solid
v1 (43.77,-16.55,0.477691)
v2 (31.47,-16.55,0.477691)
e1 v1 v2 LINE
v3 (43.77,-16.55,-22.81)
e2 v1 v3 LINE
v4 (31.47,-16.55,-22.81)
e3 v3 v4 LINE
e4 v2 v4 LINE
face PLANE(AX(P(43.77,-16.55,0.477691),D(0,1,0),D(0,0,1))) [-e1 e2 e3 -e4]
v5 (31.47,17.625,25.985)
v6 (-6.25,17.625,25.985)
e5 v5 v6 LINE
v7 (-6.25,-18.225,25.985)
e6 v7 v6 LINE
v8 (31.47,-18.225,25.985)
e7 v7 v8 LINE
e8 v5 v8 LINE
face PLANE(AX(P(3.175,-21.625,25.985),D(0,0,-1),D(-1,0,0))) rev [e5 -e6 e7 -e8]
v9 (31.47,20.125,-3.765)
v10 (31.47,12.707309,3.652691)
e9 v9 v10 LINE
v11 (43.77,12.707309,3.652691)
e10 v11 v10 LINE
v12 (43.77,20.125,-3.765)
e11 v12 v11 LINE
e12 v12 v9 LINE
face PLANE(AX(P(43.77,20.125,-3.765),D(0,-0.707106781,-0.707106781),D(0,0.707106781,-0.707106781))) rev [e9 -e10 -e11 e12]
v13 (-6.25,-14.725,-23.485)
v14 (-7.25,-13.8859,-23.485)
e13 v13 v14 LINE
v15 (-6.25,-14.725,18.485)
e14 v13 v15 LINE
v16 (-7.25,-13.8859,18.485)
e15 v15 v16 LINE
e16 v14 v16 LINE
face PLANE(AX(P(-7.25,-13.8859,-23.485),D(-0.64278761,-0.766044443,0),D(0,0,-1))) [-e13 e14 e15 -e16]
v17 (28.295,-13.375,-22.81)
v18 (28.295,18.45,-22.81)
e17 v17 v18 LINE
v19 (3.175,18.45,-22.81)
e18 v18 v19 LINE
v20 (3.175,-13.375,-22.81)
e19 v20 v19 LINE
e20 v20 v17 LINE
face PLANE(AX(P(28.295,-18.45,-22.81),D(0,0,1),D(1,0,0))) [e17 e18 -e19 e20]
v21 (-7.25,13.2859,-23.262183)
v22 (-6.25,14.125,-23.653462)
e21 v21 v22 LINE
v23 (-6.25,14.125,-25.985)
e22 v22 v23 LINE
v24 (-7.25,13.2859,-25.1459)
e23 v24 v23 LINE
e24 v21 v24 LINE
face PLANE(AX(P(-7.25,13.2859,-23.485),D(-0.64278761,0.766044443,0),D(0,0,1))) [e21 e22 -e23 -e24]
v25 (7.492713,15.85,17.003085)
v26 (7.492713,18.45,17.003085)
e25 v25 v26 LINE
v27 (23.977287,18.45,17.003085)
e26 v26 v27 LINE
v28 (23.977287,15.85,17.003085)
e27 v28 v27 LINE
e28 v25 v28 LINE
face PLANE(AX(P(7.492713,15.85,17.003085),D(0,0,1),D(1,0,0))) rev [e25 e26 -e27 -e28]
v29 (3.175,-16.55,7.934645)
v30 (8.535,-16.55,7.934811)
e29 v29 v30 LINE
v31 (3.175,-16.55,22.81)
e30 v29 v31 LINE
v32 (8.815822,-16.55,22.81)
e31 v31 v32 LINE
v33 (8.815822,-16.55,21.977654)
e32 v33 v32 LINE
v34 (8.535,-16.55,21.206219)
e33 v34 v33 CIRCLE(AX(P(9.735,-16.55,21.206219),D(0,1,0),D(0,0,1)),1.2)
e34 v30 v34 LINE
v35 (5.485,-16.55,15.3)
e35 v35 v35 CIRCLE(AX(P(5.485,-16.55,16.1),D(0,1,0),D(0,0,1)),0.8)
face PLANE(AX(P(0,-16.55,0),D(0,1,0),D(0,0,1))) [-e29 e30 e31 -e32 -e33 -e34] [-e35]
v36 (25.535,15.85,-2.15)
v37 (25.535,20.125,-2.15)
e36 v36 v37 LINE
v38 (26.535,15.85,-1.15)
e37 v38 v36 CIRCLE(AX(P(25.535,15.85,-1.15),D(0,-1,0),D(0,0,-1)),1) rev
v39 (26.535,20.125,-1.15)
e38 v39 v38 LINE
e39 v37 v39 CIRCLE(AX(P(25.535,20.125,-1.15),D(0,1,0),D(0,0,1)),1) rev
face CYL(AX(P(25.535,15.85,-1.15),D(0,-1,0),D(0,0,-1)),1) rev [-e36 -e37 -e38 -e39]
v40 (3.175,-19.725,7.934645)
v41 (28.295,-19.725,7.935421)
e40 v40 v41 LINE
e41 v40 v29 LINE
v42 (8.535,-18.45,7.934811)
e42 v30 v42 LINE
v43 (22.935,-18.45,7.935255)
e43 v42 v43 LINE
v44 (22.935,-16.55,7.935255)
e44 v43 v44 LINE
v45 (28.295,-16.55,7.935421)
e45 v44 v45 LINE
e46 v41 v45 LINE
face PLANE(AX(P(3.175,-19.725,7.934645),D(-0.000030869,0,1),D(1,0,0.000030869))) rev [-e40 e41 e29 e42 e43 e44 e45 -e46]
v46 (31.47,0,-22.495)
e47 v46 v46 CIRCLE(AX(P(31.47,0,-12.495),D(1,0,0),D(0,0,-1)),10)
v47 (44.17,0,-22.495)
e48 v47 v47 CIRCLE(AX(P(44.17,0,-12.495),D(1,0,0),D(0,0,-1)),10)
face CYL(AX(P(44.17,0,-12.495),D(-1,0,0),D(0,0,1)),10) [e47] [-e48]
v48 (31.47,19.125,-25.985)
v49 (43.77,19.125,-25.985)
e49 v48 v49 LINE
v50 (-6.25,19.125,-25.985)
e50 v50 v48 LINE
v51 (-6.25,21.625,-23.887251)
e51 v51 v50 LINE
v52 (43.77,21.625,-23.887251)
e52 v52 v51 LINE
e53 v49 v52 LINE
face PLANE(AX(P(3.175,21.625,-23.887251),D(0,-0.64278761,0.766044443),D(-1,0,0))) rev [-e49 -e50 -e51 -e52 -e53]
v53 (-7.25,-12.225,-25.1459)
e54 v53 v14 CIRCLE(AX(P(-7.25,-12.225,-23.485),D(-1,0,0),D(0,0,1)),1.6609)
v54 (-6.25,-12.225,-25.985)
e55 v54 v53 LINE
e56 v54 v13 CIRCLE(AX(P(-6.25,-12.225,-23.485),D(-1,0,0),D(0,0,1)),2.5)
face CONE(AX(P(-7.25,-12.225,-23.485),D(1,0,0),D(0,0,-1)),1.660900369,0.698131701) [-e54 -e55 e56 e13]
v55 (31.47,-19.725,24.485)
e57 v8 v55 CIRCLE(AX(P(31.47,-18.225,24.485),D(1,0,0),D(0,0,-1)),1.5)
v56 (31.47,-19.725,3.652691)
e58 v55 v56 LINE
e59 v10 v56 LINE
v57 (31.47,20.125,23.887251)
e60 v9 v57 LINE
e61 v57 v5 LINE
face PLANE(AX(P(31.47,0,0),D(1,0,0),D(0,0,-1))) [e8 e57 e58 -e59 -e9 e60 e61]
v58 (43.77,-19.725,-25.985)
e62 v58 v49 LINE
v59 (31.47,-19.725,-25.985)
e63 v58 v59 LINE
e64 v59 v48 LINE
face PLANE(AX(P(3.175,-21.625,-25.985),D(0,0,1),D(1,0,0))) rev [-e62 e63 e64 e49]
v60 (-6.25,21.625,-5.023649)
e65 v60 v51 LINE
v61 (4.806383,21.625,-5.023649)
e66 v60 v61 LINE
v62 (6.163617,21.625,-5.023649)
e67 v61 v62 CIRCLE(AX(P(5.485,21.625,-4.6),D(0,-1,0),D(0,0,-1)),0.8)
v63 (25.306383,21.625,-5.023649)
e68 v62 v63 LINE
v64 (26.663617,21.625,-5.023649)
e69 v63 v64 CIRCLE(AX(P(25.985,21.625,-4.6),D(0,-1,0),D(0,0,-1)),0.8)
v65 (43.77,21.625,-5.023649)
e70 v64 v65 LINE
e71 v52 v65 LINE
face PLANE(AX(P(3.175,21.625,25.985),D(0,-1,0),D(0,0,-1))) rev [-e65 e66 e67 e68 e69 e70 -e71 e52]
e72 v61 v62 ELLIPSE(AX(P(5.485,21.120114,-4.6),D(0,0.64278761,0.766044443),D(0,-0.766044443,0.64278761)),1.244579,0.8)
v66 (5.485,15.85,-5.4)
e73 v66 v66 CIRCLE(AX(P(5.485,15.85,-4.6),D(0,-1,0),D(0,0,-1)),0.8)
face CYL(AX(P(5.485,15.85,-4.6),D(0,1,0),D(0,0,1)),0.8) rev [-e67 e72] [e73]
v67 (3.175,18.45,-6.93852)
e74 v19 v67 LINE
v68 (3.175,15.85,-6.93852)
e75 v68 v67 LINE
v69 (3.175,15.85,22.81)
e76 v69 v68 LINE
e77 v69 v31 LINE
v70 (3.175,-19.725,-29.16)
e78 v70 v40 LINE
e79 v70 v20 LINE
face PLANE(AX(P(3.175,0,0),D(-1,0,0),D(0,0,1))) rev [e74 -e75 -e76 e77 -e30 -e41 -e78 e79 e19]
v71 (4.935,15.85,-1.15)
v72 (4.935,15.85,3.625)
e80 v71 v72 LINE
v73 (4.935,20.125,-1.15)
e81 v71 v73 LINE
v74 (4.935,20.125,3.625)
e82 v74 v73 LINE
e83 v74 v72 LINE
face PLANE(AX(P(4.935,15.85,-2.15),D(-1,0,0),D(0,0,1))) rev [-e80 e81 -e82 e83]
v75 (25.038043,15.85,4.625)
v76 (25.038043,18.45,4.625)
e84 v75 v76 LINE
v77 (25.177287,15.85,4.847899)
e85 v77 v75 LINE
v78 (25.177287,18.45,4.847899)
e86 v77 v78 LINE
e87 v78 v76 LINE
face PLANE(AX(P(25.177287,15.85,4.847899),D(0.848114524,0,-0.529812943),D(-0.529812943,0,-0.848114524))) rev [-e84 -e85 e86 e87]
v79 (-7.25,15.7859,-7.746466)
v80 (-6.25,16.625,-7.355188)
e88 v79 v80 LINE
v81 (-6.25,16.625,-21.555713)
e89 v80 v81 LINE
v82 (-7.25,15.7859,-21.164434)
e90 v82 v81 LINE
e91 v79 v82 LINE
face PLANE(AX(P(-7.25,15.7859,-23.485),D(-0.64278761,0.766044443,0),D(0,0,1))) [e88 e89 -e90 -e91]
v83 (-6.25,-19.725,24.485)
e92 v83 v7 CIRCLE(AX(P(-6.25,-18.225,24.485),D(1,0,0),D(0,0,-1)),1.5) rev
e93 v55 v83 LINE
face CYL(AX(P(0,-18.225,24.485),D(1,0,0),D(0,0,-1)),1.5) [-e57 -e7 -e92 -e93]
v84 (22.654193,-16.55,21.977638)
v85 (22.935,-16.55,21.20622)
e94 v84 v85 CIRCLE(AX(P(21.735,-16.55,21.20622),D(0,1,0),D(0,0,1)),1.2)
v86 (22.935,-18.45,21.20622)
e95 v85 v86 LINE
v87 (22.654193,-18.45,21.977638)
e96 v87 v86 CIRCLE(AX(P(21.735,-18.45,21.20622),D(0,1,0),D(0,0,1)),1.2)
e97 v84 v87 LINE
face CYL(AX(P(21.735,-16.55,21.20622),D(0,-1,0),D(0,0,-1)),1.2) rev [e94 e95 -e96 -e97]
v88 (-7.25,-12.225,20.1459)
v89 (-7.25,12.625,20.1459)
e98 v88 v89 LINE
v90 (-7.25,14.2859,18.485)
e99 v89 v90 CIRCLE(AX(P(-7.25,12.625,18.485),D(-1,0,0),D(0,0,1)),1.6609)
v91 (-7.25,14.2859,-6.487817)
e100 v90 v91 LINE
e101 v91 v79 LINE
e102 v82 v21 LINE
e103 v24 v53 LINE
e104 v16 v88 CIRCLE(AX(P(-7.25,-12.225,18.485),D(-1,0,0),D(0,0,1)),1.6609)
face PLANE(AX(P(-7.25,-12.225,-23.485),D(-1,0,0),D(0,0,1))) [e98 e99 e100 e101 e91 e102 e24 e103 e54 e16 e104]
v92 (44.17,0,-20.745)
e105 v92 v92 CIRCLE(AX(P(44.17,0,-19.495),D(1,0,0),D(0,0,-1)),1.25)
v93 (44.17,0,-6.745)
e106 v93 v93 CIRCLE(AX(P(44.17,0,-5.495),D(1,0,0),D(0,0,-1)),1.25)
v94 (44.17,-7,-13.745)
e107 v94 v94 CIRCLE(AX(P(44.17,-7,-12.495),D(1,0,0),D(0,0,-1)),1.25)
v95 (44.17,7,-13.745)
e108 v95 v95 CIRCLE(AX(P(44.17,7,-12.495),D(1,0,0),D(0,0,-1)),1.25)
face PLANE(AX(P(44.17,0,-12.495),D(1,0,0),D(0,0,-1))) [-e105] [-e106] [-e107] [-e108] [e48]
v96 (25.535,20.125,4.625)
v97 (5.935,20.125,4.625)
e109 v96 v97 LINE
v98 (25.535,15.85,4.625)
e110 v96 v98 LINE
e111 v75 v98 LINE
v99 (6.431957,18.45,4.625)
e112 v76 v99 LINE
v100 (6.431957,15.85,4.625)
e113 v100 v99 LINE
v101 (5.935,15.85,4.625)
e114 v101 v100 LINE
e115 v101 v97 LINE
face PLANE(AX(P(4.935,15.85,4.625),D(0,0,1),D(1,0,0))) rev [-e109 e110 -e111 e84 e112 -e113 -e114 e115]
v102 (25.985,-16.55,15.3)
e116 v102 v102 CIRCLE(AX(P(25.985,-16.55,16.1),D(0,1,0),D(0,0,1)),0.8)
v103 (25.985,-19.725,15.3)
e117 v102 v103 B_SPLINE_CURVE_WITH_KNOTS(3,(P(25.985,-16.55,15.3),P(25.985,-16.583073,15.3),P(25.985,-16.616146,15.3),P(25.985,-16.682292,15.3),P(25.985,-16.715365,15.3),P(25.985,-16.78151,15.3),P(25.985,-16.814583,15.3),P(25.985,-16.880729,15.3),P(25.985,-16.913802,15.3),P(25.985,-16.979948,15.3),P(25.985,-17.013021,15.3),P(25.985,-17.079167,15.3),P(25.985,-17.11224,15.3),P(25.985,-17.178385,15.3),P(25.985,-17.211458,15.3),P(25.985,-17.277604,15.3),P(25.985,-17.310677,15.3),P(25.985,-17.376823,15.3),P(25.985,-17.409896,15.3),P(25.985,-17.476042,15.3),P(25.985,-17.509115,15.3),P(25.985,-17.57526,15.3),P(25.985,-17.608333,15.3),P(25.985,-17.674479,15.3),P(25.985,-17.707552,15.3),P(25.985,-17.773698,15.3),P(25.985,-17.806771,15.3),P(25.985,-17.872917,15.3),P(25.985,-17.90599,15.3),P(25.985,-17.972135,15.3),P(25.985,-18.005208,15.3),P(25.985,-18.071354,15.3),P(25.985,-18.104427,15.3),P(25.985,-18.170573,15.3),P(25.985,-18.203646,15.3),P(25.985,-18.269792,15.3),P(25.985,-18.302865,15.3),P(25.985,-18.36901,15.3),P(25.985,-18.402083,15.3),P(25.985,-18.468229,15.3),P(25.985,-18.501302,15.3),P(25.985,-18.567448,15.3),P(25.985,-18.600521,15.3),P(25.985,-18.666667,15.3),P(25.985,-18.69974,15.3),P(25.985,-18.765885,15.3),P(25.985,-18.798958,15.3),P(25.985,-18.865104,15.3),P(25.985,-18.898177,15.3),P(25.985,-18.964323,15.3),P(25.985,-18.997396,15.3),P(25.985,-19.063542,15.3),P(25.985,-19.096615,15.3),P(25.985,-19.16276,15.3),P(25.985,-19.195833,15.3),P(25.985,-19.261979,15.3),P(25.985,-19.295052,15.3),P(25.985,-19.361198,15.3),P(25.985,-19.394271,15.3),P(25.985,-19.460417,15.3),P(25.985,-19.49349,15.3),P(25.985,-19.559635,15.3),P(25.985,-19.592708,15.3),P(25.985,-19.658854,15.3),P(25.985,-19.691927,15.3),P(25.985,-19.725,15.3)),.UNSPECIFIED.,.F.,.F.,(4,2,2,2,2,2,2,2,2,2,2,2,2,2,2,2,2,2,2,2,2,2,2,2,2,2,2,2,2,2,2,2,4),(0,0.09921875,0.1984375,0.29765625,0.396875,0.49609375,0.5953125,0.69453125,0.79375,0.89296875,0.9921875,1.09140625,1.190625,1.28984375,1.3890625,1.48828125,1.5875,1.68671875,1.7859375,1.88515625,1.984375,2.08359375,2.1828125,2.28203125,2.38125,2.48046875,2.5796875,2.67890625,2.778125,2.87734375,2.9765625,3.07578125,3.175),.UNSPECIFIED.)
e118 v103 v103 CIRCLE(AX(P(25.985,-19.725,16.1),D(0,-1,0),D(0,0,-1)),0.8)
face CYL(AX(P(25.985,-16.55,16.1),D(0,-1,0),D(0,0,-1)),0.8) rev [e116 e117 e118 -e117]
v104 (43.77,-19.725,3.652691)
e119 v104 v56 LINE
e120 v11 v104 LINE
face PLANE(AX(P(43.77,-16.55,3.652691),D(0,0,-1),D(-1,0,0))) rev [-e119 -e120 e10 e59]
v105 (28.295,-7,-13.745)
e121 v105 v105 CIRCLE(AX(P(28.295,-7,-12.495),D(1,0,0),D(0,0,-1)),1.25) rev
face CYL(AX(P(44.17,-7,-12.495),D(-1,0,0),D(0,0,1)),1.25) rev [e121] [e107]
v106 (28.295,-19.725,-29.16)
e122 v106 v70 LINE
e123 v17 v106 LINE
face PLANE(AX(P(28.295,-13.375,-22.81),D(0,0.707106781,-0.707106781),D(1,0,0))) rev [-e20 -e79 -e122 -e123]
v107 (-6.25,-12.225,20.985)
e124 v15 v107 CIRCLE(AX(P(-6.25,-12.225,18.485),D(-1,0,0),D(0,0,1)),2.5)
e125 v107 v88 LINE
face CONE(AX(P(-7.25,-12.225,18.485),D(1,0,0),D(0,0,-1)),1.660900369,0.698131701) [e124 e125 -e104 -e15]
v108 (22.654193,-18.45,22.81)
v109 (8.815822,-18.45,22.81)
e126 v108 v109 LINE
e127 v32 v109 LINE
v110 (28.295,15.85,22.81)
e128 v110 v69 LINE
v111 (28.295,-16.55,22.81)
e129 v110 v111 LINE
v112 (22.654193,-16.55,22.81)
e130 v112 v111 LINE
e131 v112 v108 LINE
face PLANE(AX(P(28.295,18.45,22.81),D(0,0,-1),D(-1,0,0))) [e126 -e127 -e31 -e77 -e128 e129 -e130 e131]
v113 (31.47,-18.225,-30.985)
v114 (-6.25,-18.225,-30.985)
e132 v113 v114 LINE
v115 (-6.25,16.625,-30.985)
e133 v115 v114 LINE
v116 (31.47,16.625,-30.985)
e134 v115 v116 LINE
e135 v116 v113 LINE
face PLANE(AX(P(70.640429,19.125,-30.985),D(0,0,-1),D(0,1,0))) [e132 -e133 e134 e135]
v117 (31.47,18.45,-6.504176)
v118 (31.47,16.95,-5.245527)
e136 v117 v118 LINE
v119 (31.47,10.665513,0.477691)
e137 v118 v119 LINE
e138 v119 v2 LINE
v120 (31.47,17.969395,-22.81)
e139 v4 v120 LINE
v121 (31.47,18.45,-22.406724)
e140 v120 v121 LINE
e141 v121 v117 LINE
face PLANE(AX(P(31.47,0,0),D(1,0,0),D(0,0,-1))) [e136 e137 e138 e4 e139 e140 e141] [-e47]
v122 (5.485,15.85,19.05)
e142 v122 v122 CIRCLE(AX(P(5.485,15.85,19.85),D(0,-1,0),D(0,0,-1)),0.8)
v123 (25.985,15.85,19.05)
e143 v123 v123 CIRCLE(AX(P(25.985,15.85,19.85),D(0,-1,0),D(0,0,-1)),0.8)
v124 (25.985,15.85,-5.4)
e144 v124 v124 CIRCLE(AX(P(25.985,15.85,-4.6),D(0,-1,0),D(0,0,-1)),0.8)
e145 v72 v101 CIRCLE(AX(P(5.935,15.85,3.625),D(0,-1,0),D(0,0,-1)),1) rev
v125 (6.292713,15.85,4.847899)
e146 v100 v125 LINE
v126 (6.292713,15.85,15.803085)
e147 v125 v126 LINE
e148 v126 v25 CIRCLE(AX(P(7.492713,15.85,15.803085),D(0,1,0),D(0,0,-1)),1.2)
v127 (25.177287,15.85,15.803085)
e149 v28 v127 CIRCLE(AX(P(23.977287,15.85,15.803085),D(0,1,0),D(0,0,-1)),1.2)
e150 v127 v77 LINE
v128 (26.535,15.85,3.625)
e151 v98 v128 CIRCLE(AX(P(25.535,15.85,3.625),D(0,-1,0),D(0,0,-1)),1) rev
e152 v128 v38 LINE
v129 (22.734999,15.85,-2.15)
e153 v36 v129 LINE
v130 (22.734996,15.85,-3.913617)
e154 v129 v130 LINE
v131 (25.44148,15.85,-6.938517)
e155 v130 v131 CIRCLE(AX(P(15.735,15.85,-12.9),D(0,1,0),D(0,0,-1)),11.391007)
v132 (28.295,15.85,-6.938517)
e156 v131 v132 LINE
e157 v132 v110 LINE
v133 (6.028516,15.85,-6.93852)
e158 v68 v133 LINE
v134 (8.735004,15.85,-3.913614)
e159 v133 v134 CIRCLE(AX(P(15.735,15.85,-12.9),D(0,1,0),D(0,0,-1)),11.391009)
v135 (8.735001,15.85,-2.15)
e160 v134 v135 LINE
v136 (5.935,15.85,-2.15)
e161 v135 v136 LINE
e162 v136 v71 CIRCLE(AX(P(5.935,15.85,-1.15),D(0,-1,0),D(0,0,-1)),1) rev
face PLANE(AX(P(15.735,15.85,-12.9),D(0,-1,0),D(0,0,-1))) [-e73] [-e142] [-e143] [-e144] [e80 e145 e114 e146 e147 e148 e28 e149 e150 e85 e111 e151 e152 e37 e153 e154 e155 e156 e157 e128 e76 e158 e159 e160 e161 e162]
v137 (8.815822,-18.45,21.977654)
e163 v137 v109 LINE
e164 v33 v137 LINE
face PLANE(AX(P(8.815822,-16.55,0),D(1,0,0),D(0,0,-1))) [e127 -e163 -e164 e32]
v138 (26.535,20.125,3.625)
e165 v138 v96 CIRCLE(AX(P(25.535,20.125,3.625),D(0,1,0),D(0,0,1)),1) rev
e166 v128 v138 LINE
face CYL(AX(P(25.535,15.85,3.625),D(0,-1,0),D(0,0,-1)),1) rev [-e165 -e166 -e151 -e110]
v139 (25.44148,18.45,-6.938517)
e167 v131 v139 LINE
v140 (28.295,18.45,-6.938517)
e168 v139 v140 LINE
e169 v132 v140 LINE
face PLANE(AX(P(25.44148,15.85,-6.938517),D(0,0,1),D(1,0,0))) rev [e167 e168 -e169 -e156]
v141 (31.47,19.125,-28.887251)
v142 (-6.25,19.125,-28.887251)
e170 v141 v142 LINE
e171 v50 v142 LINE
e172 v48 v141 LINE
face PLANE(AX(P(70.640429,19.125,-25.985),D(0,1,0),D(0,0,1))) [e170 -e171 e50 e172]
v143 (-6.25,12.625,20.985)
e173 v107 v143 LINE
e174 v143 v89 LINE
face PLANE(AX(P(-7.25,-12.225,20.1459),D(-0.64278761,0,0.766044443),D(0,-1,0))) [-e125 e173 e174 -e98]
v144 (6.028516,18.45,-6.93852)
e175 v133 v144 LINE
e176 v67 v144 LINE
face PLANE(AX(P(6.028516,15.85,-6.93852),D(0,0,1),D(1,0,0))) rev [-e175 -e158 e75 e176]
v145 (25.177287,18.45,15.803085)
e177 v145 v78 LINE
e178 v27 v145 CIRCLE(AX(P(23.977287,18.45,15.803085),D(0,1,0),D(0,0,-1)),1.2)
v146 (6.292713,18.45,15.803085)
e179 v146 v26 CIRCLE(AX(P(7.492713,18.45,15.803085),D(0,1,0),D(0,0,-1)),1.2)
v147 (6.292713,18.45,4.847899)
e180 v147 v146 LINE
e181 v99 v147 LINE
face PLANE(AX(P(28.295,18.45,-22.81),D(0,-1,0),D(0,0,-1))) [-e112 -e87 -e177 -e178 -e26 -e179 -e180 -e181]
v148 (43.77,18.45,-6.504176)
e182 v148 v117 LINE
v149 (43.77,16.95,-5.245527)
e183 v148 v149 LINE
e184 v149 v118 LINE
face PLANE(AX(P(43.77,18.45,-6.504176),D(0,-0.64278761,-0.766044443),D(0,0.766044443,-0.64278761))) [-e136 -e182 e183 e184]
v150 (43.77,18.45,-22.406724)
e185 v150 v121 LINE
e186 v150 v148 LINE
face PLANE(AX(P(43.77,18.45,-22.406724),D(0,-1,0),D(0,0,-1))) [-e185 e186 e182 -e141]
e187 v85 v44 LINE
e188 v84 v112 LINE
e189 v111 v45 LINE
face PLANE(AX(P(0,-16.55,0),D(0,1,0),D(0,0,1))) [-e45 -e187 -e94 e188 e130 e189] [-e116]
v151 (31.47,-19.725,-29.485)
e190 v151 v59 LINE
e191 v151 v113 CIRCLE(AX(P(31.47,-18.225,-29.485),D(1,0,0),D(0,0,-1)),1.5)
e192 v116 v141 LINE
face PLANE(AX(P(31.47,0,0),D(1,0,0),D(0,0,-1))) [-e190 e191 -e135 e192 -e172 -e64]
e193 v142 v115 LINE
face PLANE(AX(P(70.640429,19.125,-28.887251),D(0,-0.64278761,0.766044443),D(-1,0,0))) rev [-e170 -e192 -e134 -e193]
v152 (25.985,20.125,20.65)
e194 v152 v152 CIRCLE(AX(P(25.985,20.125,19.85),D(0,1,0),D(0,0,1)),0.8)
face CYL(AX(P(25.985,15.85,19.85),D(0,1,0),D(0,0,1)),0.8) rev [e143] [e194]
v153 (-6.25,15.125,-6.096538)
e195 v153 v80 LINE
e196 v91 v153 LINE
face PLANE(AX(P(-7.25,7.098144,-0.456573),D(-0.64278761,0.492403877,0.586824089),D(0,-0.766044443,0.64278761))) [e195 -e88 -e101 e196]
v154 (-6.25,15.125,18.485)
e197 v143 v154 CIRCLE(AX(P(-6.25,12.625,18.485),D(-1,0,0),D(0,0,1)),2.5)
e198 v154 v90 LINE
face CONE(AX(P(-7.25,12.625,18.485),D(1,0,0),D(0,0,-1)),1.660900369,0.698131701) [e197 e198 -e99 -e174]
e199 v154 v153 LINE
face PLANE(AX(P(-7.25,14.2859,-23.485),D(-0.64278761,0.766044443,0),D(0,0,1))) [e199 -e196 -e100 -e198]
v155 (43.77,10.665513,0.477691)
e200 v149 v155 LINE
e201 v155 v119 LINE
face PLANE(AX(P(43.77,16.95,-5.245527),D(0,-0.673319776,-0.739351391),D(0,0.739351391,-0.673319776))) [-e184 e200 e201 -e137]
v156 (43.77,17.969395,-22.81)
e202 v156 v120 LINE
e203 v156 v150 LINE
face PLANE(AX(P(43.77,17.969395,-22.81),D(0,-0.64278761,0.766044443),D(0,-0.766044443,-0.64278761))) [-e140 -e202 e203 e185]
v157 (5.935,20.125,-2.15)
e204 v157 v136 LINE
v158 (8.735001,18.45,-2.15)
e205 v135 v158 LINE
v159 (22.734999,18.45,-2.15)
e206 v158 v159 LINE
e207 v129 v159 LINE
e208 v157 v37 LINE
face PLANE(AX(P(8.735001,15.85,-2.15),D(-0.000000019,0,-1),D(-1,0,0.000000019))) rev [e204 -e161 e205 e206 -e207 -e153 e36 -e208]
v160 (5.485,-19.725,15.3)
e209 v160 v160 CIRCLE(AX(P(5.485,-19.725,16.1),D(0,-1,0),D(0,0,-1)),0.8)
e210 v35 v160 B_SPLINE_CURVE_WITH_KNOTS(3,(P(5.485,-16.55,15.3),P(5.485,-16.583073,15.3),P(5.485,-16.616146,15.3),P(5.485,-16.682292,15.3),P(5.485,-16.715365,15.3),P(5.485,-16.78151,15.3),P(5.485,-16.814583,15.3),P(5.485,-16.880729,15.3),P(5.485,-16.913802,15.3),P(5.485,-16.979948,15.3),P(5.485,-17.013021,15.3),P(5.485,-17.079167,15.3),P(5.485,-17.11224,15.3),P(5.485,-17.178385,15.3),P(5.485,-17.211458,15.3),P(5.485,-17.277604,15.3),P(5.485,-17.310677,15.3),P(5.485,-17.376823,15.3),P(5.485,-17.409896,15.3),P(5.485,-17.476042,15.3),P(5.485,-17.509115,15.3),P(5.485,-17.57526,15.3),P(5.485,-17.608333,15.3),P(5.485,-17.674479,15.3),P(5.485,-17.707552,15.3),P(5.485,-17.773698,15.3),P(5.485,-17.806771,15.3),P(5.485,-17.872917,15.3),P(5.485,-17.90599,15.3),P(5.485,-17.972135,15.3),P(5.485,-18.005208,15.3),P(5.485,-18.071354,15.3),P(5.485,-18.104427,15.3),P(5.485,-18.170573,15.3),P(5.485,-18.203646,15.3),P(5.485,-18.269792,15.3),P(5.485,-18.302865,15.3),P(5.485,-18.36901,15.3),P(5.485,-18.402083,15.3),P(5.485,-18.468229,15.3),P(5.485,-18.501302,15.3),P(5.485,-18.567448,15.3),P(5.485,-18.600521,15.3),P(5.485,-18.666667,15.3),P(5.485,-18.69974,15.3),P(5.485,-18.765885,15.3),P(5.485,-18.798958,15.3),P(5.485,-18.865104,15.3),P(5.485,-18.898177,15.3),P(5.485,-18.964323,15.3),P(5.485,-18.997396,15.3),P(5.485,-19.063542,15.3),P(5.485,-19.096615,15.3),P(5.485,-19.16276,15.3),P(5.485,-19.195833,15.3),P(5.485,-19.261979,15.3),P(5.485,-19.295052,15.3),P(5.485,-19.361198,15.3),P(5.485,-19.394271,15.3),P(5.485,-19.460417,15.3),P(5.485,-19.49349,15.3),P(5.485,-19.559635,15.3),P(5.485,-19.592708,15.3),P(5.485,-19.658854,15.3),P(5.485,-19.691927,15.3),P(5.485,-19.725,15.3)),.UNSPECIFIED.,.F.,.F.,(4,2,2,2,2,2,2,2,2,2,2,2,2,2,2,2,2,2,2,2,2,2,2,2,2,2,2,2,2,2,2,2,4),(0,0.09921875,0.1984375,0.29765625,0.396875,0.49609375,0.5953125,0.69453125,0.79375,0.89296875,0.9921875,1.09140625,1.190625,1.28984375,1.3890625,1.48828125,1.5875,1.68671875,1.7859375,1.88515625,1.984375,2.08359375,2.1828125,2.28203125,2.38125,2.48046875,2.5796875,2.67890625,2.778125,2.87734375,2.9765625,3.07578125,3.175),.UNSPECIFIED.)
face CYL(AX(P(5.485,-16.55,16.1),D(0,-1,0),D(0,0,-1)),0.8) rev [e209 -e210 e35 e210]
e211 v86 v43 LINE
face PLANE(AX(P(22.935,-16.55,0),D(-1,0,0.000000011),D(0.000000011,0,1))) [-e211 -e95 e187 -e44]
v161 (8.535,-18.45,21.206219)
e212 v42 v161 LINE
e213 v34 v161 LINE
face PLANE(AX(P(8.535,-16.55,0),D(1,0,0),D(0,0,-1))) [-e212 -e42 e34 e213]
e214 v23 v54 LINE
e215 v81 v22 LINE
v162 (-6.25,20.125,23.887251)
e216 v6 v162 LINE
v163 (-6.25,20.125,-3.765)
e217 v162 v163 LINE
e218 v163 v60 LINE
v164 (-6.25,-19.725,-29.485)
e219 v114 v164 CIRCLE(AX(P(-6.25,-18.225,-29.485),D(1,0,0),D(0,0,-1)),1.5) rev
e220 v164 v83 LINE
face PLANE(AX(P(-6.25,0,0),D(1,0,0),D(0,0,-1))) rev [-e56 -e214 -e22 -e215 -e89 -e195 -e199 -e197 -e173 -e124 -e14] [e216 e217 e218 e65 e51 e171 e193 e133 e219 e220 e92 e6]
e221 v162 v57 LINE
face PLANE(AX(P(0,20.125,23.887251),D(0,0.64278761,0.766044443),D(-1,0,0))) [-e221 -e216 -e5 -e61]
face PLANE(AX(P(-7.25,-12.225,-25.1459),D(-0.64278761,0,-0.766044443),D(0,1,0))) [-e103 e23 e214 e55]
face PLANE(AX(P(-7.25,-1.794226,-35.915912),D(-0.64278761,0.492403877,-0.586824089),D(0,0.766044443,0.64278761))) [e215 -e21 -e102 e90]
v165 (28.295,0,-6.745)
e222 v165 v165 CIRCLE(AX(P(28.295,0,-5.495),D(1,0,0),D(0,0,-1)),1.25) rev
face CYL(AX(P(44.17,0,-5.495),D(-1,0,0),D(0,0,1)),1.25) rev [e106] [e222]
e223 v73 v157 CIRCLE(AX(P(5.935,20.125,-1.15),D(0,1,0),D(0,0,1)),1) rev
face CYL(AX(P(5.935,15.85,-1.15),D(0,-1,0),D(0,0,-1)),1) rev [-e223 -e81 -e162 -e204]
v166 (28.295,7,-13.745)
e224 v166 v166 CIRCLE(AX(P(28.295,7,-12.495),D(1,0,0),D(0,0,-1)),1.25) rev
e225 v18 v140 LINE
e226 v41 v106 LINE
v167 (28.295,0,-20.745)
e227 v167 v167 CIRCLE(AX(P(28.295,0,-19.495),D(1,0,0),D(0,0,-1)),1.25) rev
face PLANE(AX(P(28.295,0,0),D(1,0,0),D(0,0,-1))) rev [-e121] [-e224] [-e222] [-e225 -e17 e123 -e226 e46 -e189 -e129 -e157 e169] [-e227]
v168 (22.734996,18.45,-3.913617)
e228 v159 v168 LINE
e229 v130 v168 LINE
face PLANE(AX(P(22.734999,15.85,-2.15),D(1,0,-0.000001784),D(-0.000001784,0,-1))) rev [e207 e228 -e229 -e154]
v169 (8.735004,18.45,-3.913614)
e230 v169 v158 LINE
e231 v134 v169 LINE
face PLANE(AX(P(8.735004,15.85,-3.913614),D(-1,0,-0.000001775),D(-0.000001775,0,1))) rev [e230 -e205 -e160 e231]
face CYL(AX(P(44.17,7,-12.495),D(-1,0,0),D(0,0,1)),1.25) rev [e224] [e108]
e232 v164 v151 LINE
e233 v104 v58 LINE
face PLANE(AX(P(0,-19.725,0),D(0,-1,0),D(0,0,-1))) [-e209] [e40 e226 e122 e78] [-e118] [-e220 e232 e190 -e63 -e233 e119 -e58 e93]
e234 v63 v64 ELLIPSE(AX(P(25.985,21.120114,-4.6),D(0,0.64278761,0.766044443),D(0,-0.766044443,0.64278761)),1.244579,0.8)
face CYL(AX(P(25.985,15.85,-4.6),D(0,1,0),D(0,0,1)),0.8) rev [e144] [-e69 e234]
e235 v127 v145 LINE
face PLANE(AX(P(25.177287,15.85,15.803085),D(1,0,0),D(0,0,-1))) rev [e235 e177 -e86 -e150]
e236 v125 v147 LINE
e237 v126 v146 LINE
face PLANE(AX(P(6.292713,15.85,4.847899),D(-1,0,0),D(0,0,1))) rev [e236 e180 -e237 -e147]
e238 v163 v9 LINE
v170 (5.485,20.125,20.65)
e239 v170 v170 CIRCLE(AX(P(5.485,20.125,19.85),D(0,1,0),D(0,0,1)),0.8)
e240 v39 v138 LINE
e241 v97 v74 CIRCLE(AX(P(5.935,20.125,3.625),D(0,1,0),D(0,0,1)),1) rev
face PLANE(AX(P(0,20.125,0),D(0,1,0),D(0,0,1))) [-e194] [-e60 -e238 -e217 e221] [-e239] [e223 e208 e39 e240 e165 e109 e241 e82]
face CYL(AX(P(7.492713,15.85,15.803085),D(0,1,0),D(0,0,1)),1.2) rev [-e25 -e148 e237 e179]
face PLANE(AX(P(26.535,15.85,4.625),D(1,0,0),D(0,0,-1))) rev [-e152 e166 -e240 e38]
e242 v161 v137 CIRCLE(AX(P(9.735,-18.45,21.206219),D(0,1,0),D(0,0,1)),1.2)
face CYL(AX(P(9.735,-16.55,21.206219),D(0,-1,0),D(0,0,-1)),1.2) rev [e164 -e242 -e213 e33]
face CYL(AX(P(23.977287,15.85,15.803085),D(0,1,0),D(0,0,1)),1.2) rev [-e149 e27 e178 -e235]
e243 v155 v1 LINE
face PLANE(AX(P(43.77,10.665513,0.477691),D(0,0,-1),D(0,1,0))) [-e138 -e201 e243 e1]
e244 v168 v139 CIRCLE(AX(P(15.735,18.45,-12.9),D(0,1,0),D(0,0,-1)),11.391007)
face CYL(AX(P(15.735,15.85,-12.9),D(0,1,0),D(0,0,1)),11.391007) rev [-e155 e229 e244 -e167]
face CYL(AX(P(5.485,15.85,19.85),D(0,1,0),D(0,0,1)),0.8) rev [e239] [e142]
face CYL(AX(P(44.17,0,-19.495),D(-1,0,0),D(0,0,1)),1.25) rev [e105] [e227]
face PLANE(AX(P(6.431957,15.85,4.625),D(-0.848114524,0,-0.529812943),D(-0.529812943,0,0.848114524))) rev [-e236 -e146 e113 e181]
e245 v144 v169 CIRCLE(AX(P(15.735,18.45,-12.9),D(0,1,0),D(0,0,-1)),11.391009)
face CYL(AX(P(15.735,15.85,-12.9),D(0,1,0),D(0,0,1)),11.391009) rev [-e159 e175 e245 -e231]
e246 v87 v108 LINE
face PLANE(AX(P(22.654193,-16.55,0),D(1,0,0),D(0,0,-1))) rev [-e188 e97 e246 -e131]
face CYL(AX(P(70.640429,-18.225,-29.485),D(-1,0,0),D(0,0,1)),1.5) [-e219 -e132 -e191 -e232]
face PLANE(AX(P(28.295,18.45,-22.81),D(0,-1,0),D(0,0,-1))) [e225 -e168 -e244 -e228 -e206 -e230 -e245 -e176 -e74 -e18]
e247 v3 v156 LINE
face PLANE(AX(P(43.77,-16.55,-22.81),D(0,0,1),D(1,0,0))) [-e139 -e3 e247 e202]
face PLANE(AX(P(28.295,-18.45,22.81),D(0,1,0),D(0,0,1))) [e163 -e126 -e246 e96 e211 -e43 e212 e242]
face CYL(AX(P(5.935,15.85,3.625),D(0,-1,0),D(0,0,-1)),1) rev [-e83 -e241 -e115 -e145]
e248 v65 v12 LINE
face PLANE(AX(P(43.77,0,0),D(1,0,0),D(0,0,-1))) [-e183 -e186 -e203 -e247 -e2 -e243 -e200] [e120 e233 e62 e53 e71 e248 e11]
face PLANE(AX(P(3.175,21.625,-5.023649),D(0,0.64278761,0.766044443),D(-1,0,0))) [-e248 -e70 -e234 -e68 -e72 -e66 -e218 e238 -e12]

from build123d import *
from OCP.BRepFilletAPI import BRepFilletAPI_MakeChamfer
from build123d.topology import SkipClean

# Parameters (mm, degrees)
SKETCH1_W            = 51.97
SKETCH1_H            = 43.25
BOSS_EXTRUDE1_DEPTH  = 3.175
SKETCH2_W            = 51.97
SKETCH2_H            = 43.25
SKETCH2_W_2          = 45.62
SKETCH2_H_2          = 36.9
BOSS_EXTRUDE2_DEPTH  = 25.12
SKETCH5_R            = 0.8
BOSS_EXTRUDE4_DEPTH  = 2.6
CUT_EXTRUDE2_DEPTH   = 56.514258304
FILLET4_R            = 1
SKETCH7_W            = 28.295
SKETCH7_H            = 29.75
CUT_EXTRUDE3_DEPTH   = 1.5
CHAMFER3_SIZE2       = 1.5
CHAMFER3_SIZE        = 1.258649447
CHAMFER4_SIZE        = 2.5
CHAMFER4_SIZE2       = 2.097749078
CHAMFER5_SIZE        = 2.5
CHAMFER5_SIZE2       = 2.097749078
BOSS_EXTRUDE5_START  = 1.9
SKETCH8_R            = 0.8
BOSS_EXTRUDE5_DEPTH  = 1.9
SKETCH9_R            = 0.8
CUT_EXTRUDE4_DEPTH   = 56.514258304
SKETCH10_W           = 28.295
SKETCH10_H           = 32.92
CUT_EXTRUDE5_DEPTH   = 1.9
CHAMFER6_SIZE2       = 1.594289299
CHAMFER6_SIZE        = 1.9
CUT_EXTRUDE6_DEPTH   = 56.514258304
SKETCH12_R           = 0.8
CUT_EXTRUDE7_DEPTH   = 56.514258304
SKETCH13_W           = 28.295
SKETCH13_H           = 33.009615074
CUT_EXTRUDE8_DEPTH   = 1.9
BOSS_EXTRUDE6_DEPTH  = 3.175
SKETCH15_R           = 10
SKETCH15_R_2         = 1.25
BOSS_EXTRUDE7_DEPTH  = 12.7
CUT_EXTRUDE9_START   = -3.175
SKETCH16_R           = 1.25
CUT_EXTRUDE9_DEPTH   = 3.175
BOSS_EXTRUDE8_DEPTH  = 12.3
BOSS_EXTRUDE9_DEPTH  = 6.25
SKETCH19_W           = 5
SKETCH19_H           = 38.85
BOSS_EXTRUDE10_DEPTH = 37.72
CHAMFER7_SIZE        = 2.5
CHAMFER7_SIZE2       = 2.097749078
FILLET5_R            = 1.5
BOSS_EXTRUDE11_DEPTH = 1
CHAMFER8_SIZE        = 1
CHAMFER8_SIZE_2      = 0.839099631
CUT_EXTRUDE10_DEPTH  = 67.093795095
CHAMFER9_SIZE        = 6.35


with BuildPart() as part:
    # Sketch1 → Boss-Extrude1 (new body)
    with BuildSketch(Plane(origin=(0, 0, 0), x_dir=(0, 0, -1), z_dir=(1, 0, 0))):
        Rectangle(SKETCH1_W, SKETCH1_H)
    extrude(amount=BOSS_EXTRUDE1_DEPTH)

    # Sketch2 → Boss-Extrude2 (add)
    with BuildSketch(Plane(origin=(3.175, 0, 0), x_dir=(0, 0, -1), z_dir=(1, 0, 0))):
        Rectangle(SKETCH2_W, SKETCH2_H)
        Rectangle(SKETCH2_W_2, SKETCH2_H_2, mode=Mode.SUBTRACT)
    extrude(amount=BOSS_EXTRUDE2_DEPTH)

    # Sketch5 → Boss-Extrude4 (add)
    with BuildSketch(Plane.XZ.offset(-18.45)):
        with BuildLine():
            Line((6.028516065, -6.938519702), (3.175, -6.938519702))
            Line((3.175, -6.938519702), (3.175, 22.81))
            Line((3.175, 22.81), (28.295, 22.81))
            Line((28.295, 22.81), (28.295, -6.938516819))
            Line((28.295, -6.938516819), (25.441479797, -6.938516819))
            ThreePointArc((25.441479797, -6.938516819), (24.224057136, -5.304544733), (22.734996312, -3.913616778))
            Line((22.734996312, -3.913616778), (22.734999457, -2.150000068))
            Line((22.734999457, -2.150000068), (26.535, -2.149999996))
            Line((26.535, -2.149999996), (26.535, 4.625))
            Line((26.535, 4.625), (25.038042913, 4.625))
            Line((25.038042913, 4.625), (25.177286694, 4.847898808))
            Line((25.177286694, 4.847898808), (25.177286694, 15.803085322))
            ThreePointArc((25.177286694, 15.803085322), (24.825814832, 16.651613459), (23.977286696, 17.003085322))
            Line((23.977286696, 17.003085322), (7.492713306, 17.003085322))
            ThreePointArc((7.492713306, 17.003085322), (6.64418517, 16.651613461), (6.292713306, 15.803085325))
            Line((6.292713306, 15.803085325), (6.292713306, 4.847898808))
            Line((6.292713306, 4.847898808), (6.431957087, 4.625))
            Line((6.431957087, 4.625), (4.935, 4.625))
            Line((4.935, 4.625), (4.935, -2.149999996))
            Line((4.935, -2.149999996), (8.73500054, -2.150000068))
            Line((8.73500054, -2.150000068), (8.735003672, -3.913614235))
            ThreePointArc((8.735003672, -3.913614235), (7.245940337, -5.304544533), (6.028516065, -6.938519702))
        make_face()
        with Locations(Location((5.485, -4.6, 0), (0, 0, 270))):
            Circle(SKETCH5_R, mode=Mode.SUBTRACT)
        with Locations(Location((5.485, 19.85, 0), (0, 0, 270))):
            Circle(SKETCH5_R, mode=Mode.SUBTRACT)
        with Locations(Location((25.985, 19.85, 0), (0, 0, 270))):
            Circle(SKETCH5_R, mode=Mode.SUBTRACT)
        with Locations(Location((25.985, -4.6, 0), (0, 0, 270))):
            Circle(SKETCH5_R, mode=Mode.SUBTRACT)
    extrude(amount=BOSS_EXTRUDE4_DEPTH)

    # Sketch6 → Cut-Extrude2 (cut, through all)
    with BuildSketch(Plane.XZ.offset(-18.45)):
        Polygon((6.431957087, 4.625), (4.935, 4.625), (4.935, -2.149999996), (8.73500054, -2.149999996), (22.734999457, -2.149999996), (26.535, -2.149999996), (26.535, 4.625), (25.038042913, 4.625), align=None)
    extrude(amount=-CUT_EXTRUDE2_DEPTH, mode=Mode.SUBTRACT)

    # Fillet4
    fillet4_edges = [part.edges().sort_by_distance(p)[0] for p in [
        (4.935, 20.0375, -2.149999996),
        (4.935, 18.7375, 4.625),
        (26.535, 18.7375, 4.625),
        (26.535, 20.0375, -2.149999996),
    ]]
    fillet(fillet4_edges, radius=FILLET4_R)

    # Sketch7 → Cut-Extrude3 (cut)
    with BuildSketch(Plane(origin=(0, 21.625, 0), x_dir=(1, 0, 0), z_dir=(0, 1, 0))):
        with Locations((14.1475, -11.11)):
            Rectangle(SKETCH7_W, SKETCH7_H)
    extrude(amount=-CUT_EXTRUDE3_DEPTH, mode=Mode.SUBTRACT)

    # Chamfer3
    chamfer3_edges = [part.edges().sort_by_distance(p)[0] for p in [
        (14.1475, 21.625, -3.765),
    ]]
    chamfer3_side = [part.faces().sort_by_distance(p)[0] for p in [
        (14.1475, 21.625, -3.790172989),
    ]]
    chamfer(chamfer3_edges, length=CHAMFER3_SIZE - 0.0001, length2=CHAMFER3_SIZE2 - 0.0001, reference=chamfer3_side[0])  # a hair under: the kernel refuses the full size

    # Chamfer4
    chamfer4_edges = [part.edges().sort_by_distance(p)[0] for p in [
        (14.1475, 20.125, 25.985),
    ]]
    chamfer4_side = [part.faces().sort_by_distance(p)[0] for p in [
        (14.1475, -0.75, 25.985),
    ]]
    chamfer(chamfer4_edges, length=CHAMFER4_SIZE, length2=CHAMFER4_SIZE2, reference=chamfer4_side[0])

    # Chamfer5
    chamfer5_edges = [part.edges().sort_by_distance(p)[0] for p in [
        (14.1475, 21.625, -25.985),
    ]]
    chamfer5_side = [part.faces().sort_by_distance(p)[0] for p in [
        (14.1475, 0, -25.985),
    ]]
    chamfer(chamfer5_edges, length=CHAMFER5_SIZE, length2=CHAMFER5_SIZE2, reference=chamfer5_side[0])

    # Sketch8 → Boss-Extrude5 (add)
    # profile 1 of 2: a face of its own
    with BuildSketch(Plane(origin=(0, -18.45, 0), x_dir=(1, 0, 0), z_dir=(0, 1, 0)).offset(BOSS_EXTRUDE5_START)):
        with BuildLine():
            Line((8.535, -21.20621931), (8.535, 2.277382622))
            ThreePointArc((8.535, 2.277382622), (8.678721463, 2.846834684), (9.07545942, 3.279882607))
            ThreePointArc((9.07545942, 3.279882607), (7.174247423, 4.924433894), (5.668201654, 6.937139072))
            ThreePointArc((5.668201654, 6.937139072), (5.667144466, 6.93892423), (5.666087595, 6.940709575))
            Line((5.666087595, 6.940709575), (3.175, 6.940709575))
            Line((3.175, 6.940709575), (3.175, -22.81))
            Line((3.175, -22.81), (8.815822102, -22.81))
            Line((8.815822102, -22.81), (8.815822102, -21.97765433))
            ThreePointArc((8.815822102, -21.97765433), (8.607388924, -21.616698616), (8.535, -21.20621931))
        make_face()
        with Locations(Location((5.485, -16.1, 0), (0, 0, 90))):
            Circle(SKETCH8_R, mode=Mode.SUBTRACT)
        with Locations(Location((5.485, 4.6, 0), (0, 0, 90))):
            Circle(SKETCH8_R, mode=Mode.SUBTRACT)
    # profile 2 of 2: a face of its own
    with BuildSketch(Plane(origin=(0, -18.45, 0), x_dir=(1, 0, 0), z_dir=(0, 1, 0)).offset(BOSS_EXTRUDE5_START)):
        with BuildLine():
            Line((22.654192711, -21.977637856), (22.654192711, -22.81))
            Line((22.654192711, -22.81), (28.295, -22.81))
            Line((28.295, -22.81), (28.295, 6.939158699))
            Line((28.295, 6.939158699), (25.802994691, 6.939158699))
            ThreePointArc((25.802994691, 6.939158699), (24.296552833, 4.925292532), (22.394540839, 3.279882437))
            ThreePointArc((22.394540839, 3.279882437), (22.791278611, 2.846834547), (22.935, 2.27738262))
            Line((22.935, 2.27738262), (22.935000265, -21.206220073))
            ThreePointArc((22.935000265, -21.206220073), (22.862615212, -21.616688792), (22.654192711, -21.977637856))
        make_face()
        with Locations(Location((25.985, -16.1, 0), (0, 0, 90))):
            Circle(SKETCH8_R, mode=Mode.SUBTRACT)
        with Locations(Location((25.985, 4.6, 0), (0, 0, 90))):
            Circle(SKETCH8_R, mode=Mode.SUBTRACT)
    extrude(amount=-BOSS_EXTRUDE5_DEPTH)

    # Sketch9 → Cut-Extrude4 (cut, through all)
    with SkipClean():  # the faces are left unmerged after this step: merging them gives an invalid solid
        with BuildSketch(Plane.XZ.offset(-18.45)):
            with Locations(Location((5.485, -4.6, 0), (0, 0, 211.975852771))):
                Circle(SKETCH9_R)
            with Locations(Location((25.985, -4.6, 0), (0, 0, 211.975852771))):
                Circle(SKETCH9_R)
            with Locations(Location((25.985, 19.85, 0), (0, 0, 90))):
                Circle(SKETCH9_R)
            with Locations(Location((5.485, 19.85, 0), (0, 0, 90))):
                Circle(SKETCH9_R)
        extrude(amount=-CUT_EXTRUDE4_DEPTH, mode=Mode.SUBTRACT)
    add(part.part.scale(1), mode=Mode.REPLACE)  # the faces are merged on a copy

    # Sketch10 → Cut-Extrude5 (cut)
    with BuildSketch(Plane.XZ.offset(21.625)):
        with Locations((14.1475, 9.525)):
            Rectangle(SKETCH10_W, SKETCH10_H)
    extrude(amount=-CUT_EXTRUDE5_DEPTH, mode=Mode.SUBTRACT)

    # Chamfer6
    chamfer6_edges = [part.edges().sort_by_distance(p)[0] for p in [
        (14.1475, -19.725, -6.935),
    ]]
    chamfer6_side = [part.faces().sort_by_distance(p)[0] for p in [
        (14.1475, -19.756885786, -6.935),
    ]]
    chamfer(chamfer6_edges, length=CHAMFER6_SIZE - 0.0001, length2=CHAMFER6_SIZE2 - 0.0001, reference=chamfer6_side[0])  # a hair under: the kernel refuses the full size

    # Sketch11 → Cut-Extrude6 (cut, through all)
    with BuildSketch(Plane(origin=(0, -18.45, 0), x_dir=(1, 0, 0), z_dir=(0, 1, 0))):
        with BuildLine():
            Line((3.175, 22.81), (3.175, 6.940709575))
            Line((3.175, 6.940709575), (5.666087595, 6.940709575))
            ThreePointArc((5.666087595, 6.940709575), (7.172833315, 4.925952029), (9.07545942, 3.279882607))
            ThreePointArc((9.07545942, 3.279882607), (15.735000094, 0.521410441), (22.394540839, 3.279882437))
            ThreePointArc((22.394540839, 3.279882437), (24.296552833, 4.925292532), (25.802994691, 6.939158699))
            Line((25.802994691, 6.939158699), (28.295, 6.939158699))
            Line((28.295, 6.939158699), (28.295, 22.81))
            Line((28.295, 22.81), (3.175, 22.81))
        make_face()
    extrude(amount=-CUT_EXTRUDE6_DEPTH, mode=Mode.SUBTRACT)

    # Sketch12 → Cut-Extrude7 (cut, through all)
    with BuildSketch(Plane(origin=(0, -18.45, 0), x_dir=(1, 0, 0), z_dir=(0, 1, 0))):
        with Locations(Location((25.985, 4.6, 0), (0, 0, 148.024147229))):
            Circle(SKETCH12_R)
        with Locations(Location((25.985, -16.1, 0), (0, 0, 90))):
            Circle(SKETCH12_R)
        with Locations(Location((5.485, -16.1, 0), (0, 0, 90))):
            Circle(SKETCH12_R)
        with Locations(Location((5.485, 4.6, 0), (0, 0, 148.024147229))):
            Circle(SKETCH12_R)
    extrude(amount=-CUT_EXTRUDE7_DEPTH, mode=Mode.SUBTRACT)

    # Sketch13 → Cut-Extrude8 (cut)
    with BuildSketch(Plane.XZ.offset(21.625)):
        with Locations((14.1475, -9.480192463)):
            Rectangle(SKETCH13_W, SKETCH13_H)
    extrude(amount=-CUT_EXTRUDE8_DEPTH, mode=Mode.SUBTRACT)

    # Sketch14 → Boss-Extrude6 (add)
    with BuildSketch(Plane(origin=(28.295, 0, 0), x_dir=(0, 0, -1), z_dir=(1, 0, 0))):
        Polygon((25.985, -19.725), (25.985, 19.125), (23.887250922, 21.625), (5.023649447, 21.625), (3.765, 20.125), (-23.887250922, 20.125), (-25.985, 17.625), (-25.985, -19.725), align=None)
    extrude(amount=BOSS_EXTRUDE6_DEPTH)

    # Sketch15 → Boss-Extrude7 (add)
    with BuildSketch(Plane(origin=(31.47, 0, 0), x_dir=(0, 0, -1), z_dir=(1, 0, 0))):
        with Locations((12.495, 0)):
            Circle(SKETCH15_R)
        with Locations((12.495, 7)):
            Circle(SKETCH15_R_2, mode=Mode.SUBTRACT)
        with Locations((19.495, 0)):
            Circle(SKETCH15_R_2, mode=Mode.SUBTRACT)
        with Locations((5.495, 0)):
            Circle(SKETCH15_R_2, mode=Mode.SUBTRACT)
        with Locations((12.495, -7)):
            Circle(SKETCH15_R_2, mode=Mode.SUBTRACT)
    extrude(amount=BOSS_EXTRUDE7_DEPTH)

    # Sketch16 → Cut-Extrude9 (cut)
    with BuildSketch(Plane(origin=(31.47, 0, 0), x_dir=(0, 0, -1), z_dir=(1, 0, 0)).offset(CUT_EXTRUDE9_START)):
        with Locations((19.495, 0)):
            Circle(SKETCH16_R)
        with Locations((12.495, -7)):
            Circle(SKETCH16_R)
        with Locations((5.495, 0)):
            Circle(SKETCH16_R)
        with Locations((12.495, 7)):
            Circle(SKETCH16_R)
    extrude(amount=CUT_EXTRUDE9_DEPTH, mode=Mode.SUBTRACT)

    # Sketch17 → Boss-Extrude8 (add)
    with BuildSketch(Plane(origin=(31.47, 0, 0), x_dir=(0, 0, -1), z_dir=(1, 0, 0))):
        Polygon((25.985, -19.725), (25.985, 19.125), (23.887250922, 21.625), (5.023649447, 21.625), (3.765, 20.125), (-3.652691279, 12.707308721), (-3.652691279, 11.672370782), (-3.652691279, -16.55), (-3.652691279, -19.725), align=None)
        Polygon((-0.477691279, -16.55), (22.81, -16.55), (22.81, 17.969394506), (22.406724107, 18.45), (6.504176261, 18.45), (5.245526815, 16.95), (-0.477691279, 10.665513175), align=None, mode=Mode.SUBTRACT)
    extrude(amount=BOSS_EXTRUDE8_DEPTH)

    # Sketch18 → Boss-Extrude9 (add)
    with BuildSketch(Plane.ZY):
        Polygon((-25.985, 19.125), (-25.985, -19.725), (25.985, -19.725), (25.985, 17.625), (23.887250922, 20.125), (-3.765, 20.125), (-5.023649447, 21.625), (-23.887250922, 21.625), align=None)
    extrude(amount=BOSS_EXTRUDE9_DEPTH)

    # Sketch19 → Boss-Extrude10 (add)
    with BuildSketch(Plane.ZY.offset(6.25)):
        with Locations((-28.485, -0.3)):
            Rectangle(SKETCH19_W, SKETCH19_H)
    extrude(amount=-BOSS_EXTRUDE10_DEPTH)

    # Chamfer7
    chamfer7_edges = [part.edges().sort_by_distance(p)[0] for p in [
        (12.61, 19.125, -30.985),
    ]]
    chamfer7_side = [part.faces().sort_by_distance(p)[0] for p in [
        (12.61, -0.3, -30.985),
    ]]
    chamfer(chamfer7_edges, length=CHAMFER7_SIZE, length2=CHAMFER7_SIZE2, reference=chamfer7_side[0])

    # Fillet5
    fillet5_edges = [part.edges().sort_by_distance(p)[0] for p in [
        (12.61, -19.725, 25.985),
        (12.61, -19.725, -30.985),
    ]]
    fillet(fillet5_edges, radius=FILLET5_R)

    # Sketch20 → Boss-Extrude11 (add)
    with BuildSketch(Plane.ZY.offset(6.25)):
        with BuildLine():
            Line((-25.985, 14.125), (-25.985, -12.225))
            ThreePointArc((-25.985, -12.225), (-25.252766953, -13.992766953), (-23.485, -14.725))
            Line((-23.485, -14.725), (18.485, -14.725))
            ThreePointArc((18.485, -14.725), (20.252766953, -13.992766953), (20.985, -12.225))
            Line((20.985, -12.225), (20.985, 12.625))
            ThreePointArc((20.985, 12.625), (20.252766953, 14.392766953), (18.485, 15.125))
            Line((18.485, 15.125), (-6.096538291, 15.125))
            Line((-6.096538291, 15.125), (-7.355187738, 16.625))
            Line((-7.355187738, 16.625), (-21.555712631, 16.625))
            Line((-21.555712631, 16.625), (-23.653461709, 14.125))
            Line((-23.653461709, 14.125), (-25.985, 14.125))
        make_face()
    extrude(amount=BOSS_EXTRUDE11_DEPTH)

    # Chamfer8
    chamfer8_edges_1 = [part.edges().sort_by_distance(p)[0] for p in [
        (-7.25, 0.95, -25.985),
    ]]
    chamfer8_side_1 = [part.faces().sort_by_distance(p)[0] for p in [
        (-7.233218007, 0.95, -25.985),
    ]]
    chamfer8_edges_2 = [part.edges().sort_by_distance(p)[0] for p in [
        (-7.25, 14.125, -24.819230855),
    ]]
    chamfer8_side_2 = [part.faces().sort_by_distance(p)[0] for p in [
        (-7.233218007, 14.125, -24.819230855),
    ]]
    chamfer8_edges_3 = [part.edges().sort_by_distance(p)[0] for p in [
        (-7.25, 15.375, -22.60458717),
    ]]
    chamfer8_side_3 = [part.faces().sort_by_distance(p)[0] for p in [
        (-7.233218007, 15.375, -22.60458717),
    ]]
    chamfer8_edges_4 = [part.edges().sort_by_distance(p)[0] for p in [
        (-7.25, 16.625, -14.455450184),
    ]]
    chamfer8_side_4 = [part.faces().sort_by_distance(p)[0] for p in [
        (-7.233218007, 16.625, -14.455450184),
    ]]
    chamfer8_edges_5 = [part.edges().sort_by_distance(p)[0] for p in [
        (-7.25, 15.875, -6.725863014),
    ]]
    chamfer8_side_5 = [part.faces().sort_by_distance(p)[0] for p in [
        (-7.233218007, 15.875, -6.725863014),
    ]]
    chamfer8_edges_6 = [part.edges().sort_by_distance(p)[0] for p in [
        (-7.25, 15.125, 6.194230855),
    ]]
    chamfer8_side_6 = [part.faces().sort_by_distance(p)[0] for p in [
        (-7.233218007, 15.125, 6.194230855),
    ]]
    chamfer8_edges_7 = [part.edges().sort_by_distance(p)[0] for p in [
        (-7.25, 14.392766953, 20.252766953),
    ]]
    chamfer8_side_7 = [part.faces().sort_by_distance(p)[0] for p in [
        (-7.233218007, 14.392766953, 20.252766953),
    ]]
    chamfer8_edges_8 = [part.edges().sort_by_distance(p)[0] for p in [
        (-7.25, 0.2, 20.985),
    ]]
    chamfer8_side_8 = [part.faces().sort_by_distance(p)[0] for p in [
        (-7.233218007, 0.2, 20.985),
    ]]
    chamfer8_edges_9 = [part.edges().sort_by_distance(p)[0] for p in [
        (-7.25, -13.992766953, 20.252766953),
    ]]
    chamfer8_side_9 = [part.faces().sort_by_distance(p)[0] for p in [
        (-7.233218007, -13.992766953, 20.252766953),
    ]]
    chamfer8_edges_10 = [part.edges().sort_by_distance(p)[0] for p in [
        (-7.25, -14.725, -2.5),
    ]]
    chamfer8_side_10 = [part.faces().sort_by_distance(p)[0] for p in [
        (-7.233218007, -14.725, -2.5),
    ]]
    chamfer8_edges_11 = [part.edges().sort_by_distance(p)[0] for p in [
        (-7.25, -13.992766953, -25.252766953),
    ]]
    chamfer8_side_11 = [part.faces().sort_by_distance(p)[0] for p in [
        (-7.233218007, -13.992766953, -25.252766953),
    ]]
    chamfer8 = BRepFilletAPI_MakeChamfer(part.part.solid().wrapped)
    for e in chamfer8_edges_1:
        chamfer8.Add(CHAMFER8_SIZE - 0.0001, CHAMFER8_SIZE_2 - 0.0001, e.wrapped, chamfer8_side_1[0].wrapped)
    for e in chamfer8_edges_2:
        chamfer8.Add(CHAMFER8_SIZE - 0.0001, CHAMFER8_SIZE_2 - 0.0001, e.wrapped, chamfer8_side_2[0].wrapped)
    for e in chamfer8_edges_3:
        chamfer8.Add(CHAMFER8_SIZE - 0.0001, CHAMFER8_SIZE_2 - 0.0001, e.wrapped, chamfer8_side_3[0].wrapped)
    for e in chamfer8_edges_4:
        chamfer8.Add(CHAMFER8_SIZE - 0.0001, CHAMFER8_SIZE_2 - 0.0001, e.wrapped, chamfer8_side_4[0].wrapped)
    for e in chamfer8_edges_5:
        chamfer8.Add(CHAMFER8_SIZE - 0.0001, CHAMFER8_SIZE_2 - 0.0001, e.wrapped, chamfer8_side_5[0].wrapped)
    for e in chamfer8_edges_6:
        chamfer8.Add(CHAMFER8_SIZE - 0.0001, CHAMFER8_SIZE_2 - 0.0001, e.wrapped, chamfer8_side_6[0].wrapped)
    for e in chamfer8_edges_7:
        chamfer8.Add(CHAMFER8_SIZE - 0.0001, CHAMFER8_SIZE_2 - 0.0001, e.wrapped, chamfer8_side_7[0].wrapped)
    for e in chamfer8_edges_8:
        chamfer8.Add(CHAMFER8_SIZE - 0.0001, CHAMFER8_SIZE_2 - 0.0001, e.wrapped, chamfer8_side_8[0].wrapped)
    for e in chamfer8_edges_9:
        chamfer8.Add(CHAMFER8_SIZE - 0.0001, CHAMFER8_SIZE_2 - 0.0001, e.wrapped, chamfer8_side_9[0].wrapped)
    for e in chamfer8_edges_10:
        chamfer8.Add(CHAMFER8_SIZE - 0.0001, CHAMFER8_SIZE_2 - 0.0001, e.wrapped, chamfer8_side_10[0].wrapped)
    for e in chamfer8_edges_11:
        chamfer8.Add(CHAMFER8_SIZE - 0.0001, CHAMFER8_SIZE_2 - 0.0001, e.wrapped, chamfer8_side_11[0].wrapped)
    add(Compound.cast(chamfer8.Shape()), mode=Mode.REPLACE)  # a hair under: the kernel refuses the full size

    # Sketch21 → Cut-Extrude10 (cut, through all)
    with BuildSketch(Plane(origin=(0, -16.55, 0), x_dir=(1, 0, 0), z_dir=(0, 1, 0))):
        with BuildLine():
            Line((3.175, -7.934645212), (28.295, -7.935420651))
            Line((28.295, -7.935420651), (28.295, 6.939158699))
            Line((28.295, 6.939158699), (25.802994691, 6.939158699))
            ThreePointArc((25.802994691, 6.939158699), (24.296552833, 4.925292532), (22.394540839, 3.279882437))
            ThreePointArc((22.394540839, 3.279882437), (15.735000094, 0.521410441), (9.07545942, 3.279882607))
            ThreePointArc((9.07545942, 3.279882607), (7.172833315, 4.925952029), (5.666087595, 6.940709575))
            Line((5.666087595, 6.940709575), (3.175, 6.940709575))
            Line((3.175, 6.940709575), (3.175, -7.934645212))
        make_face()
    extrude(amount=-CUT_EXTRUDE10_DEPTH, mode=Mode.SUBTRACT)

    # Chamfer9
    chamfer9_edges = [part.edges().sort_by_distance(p)[0] for p in [
        (15.735, -19.725, -22.81),
    ]]
    chamfer(chamfer9_edges, length=CHAMFER9_SIZE)


solid = part.part
